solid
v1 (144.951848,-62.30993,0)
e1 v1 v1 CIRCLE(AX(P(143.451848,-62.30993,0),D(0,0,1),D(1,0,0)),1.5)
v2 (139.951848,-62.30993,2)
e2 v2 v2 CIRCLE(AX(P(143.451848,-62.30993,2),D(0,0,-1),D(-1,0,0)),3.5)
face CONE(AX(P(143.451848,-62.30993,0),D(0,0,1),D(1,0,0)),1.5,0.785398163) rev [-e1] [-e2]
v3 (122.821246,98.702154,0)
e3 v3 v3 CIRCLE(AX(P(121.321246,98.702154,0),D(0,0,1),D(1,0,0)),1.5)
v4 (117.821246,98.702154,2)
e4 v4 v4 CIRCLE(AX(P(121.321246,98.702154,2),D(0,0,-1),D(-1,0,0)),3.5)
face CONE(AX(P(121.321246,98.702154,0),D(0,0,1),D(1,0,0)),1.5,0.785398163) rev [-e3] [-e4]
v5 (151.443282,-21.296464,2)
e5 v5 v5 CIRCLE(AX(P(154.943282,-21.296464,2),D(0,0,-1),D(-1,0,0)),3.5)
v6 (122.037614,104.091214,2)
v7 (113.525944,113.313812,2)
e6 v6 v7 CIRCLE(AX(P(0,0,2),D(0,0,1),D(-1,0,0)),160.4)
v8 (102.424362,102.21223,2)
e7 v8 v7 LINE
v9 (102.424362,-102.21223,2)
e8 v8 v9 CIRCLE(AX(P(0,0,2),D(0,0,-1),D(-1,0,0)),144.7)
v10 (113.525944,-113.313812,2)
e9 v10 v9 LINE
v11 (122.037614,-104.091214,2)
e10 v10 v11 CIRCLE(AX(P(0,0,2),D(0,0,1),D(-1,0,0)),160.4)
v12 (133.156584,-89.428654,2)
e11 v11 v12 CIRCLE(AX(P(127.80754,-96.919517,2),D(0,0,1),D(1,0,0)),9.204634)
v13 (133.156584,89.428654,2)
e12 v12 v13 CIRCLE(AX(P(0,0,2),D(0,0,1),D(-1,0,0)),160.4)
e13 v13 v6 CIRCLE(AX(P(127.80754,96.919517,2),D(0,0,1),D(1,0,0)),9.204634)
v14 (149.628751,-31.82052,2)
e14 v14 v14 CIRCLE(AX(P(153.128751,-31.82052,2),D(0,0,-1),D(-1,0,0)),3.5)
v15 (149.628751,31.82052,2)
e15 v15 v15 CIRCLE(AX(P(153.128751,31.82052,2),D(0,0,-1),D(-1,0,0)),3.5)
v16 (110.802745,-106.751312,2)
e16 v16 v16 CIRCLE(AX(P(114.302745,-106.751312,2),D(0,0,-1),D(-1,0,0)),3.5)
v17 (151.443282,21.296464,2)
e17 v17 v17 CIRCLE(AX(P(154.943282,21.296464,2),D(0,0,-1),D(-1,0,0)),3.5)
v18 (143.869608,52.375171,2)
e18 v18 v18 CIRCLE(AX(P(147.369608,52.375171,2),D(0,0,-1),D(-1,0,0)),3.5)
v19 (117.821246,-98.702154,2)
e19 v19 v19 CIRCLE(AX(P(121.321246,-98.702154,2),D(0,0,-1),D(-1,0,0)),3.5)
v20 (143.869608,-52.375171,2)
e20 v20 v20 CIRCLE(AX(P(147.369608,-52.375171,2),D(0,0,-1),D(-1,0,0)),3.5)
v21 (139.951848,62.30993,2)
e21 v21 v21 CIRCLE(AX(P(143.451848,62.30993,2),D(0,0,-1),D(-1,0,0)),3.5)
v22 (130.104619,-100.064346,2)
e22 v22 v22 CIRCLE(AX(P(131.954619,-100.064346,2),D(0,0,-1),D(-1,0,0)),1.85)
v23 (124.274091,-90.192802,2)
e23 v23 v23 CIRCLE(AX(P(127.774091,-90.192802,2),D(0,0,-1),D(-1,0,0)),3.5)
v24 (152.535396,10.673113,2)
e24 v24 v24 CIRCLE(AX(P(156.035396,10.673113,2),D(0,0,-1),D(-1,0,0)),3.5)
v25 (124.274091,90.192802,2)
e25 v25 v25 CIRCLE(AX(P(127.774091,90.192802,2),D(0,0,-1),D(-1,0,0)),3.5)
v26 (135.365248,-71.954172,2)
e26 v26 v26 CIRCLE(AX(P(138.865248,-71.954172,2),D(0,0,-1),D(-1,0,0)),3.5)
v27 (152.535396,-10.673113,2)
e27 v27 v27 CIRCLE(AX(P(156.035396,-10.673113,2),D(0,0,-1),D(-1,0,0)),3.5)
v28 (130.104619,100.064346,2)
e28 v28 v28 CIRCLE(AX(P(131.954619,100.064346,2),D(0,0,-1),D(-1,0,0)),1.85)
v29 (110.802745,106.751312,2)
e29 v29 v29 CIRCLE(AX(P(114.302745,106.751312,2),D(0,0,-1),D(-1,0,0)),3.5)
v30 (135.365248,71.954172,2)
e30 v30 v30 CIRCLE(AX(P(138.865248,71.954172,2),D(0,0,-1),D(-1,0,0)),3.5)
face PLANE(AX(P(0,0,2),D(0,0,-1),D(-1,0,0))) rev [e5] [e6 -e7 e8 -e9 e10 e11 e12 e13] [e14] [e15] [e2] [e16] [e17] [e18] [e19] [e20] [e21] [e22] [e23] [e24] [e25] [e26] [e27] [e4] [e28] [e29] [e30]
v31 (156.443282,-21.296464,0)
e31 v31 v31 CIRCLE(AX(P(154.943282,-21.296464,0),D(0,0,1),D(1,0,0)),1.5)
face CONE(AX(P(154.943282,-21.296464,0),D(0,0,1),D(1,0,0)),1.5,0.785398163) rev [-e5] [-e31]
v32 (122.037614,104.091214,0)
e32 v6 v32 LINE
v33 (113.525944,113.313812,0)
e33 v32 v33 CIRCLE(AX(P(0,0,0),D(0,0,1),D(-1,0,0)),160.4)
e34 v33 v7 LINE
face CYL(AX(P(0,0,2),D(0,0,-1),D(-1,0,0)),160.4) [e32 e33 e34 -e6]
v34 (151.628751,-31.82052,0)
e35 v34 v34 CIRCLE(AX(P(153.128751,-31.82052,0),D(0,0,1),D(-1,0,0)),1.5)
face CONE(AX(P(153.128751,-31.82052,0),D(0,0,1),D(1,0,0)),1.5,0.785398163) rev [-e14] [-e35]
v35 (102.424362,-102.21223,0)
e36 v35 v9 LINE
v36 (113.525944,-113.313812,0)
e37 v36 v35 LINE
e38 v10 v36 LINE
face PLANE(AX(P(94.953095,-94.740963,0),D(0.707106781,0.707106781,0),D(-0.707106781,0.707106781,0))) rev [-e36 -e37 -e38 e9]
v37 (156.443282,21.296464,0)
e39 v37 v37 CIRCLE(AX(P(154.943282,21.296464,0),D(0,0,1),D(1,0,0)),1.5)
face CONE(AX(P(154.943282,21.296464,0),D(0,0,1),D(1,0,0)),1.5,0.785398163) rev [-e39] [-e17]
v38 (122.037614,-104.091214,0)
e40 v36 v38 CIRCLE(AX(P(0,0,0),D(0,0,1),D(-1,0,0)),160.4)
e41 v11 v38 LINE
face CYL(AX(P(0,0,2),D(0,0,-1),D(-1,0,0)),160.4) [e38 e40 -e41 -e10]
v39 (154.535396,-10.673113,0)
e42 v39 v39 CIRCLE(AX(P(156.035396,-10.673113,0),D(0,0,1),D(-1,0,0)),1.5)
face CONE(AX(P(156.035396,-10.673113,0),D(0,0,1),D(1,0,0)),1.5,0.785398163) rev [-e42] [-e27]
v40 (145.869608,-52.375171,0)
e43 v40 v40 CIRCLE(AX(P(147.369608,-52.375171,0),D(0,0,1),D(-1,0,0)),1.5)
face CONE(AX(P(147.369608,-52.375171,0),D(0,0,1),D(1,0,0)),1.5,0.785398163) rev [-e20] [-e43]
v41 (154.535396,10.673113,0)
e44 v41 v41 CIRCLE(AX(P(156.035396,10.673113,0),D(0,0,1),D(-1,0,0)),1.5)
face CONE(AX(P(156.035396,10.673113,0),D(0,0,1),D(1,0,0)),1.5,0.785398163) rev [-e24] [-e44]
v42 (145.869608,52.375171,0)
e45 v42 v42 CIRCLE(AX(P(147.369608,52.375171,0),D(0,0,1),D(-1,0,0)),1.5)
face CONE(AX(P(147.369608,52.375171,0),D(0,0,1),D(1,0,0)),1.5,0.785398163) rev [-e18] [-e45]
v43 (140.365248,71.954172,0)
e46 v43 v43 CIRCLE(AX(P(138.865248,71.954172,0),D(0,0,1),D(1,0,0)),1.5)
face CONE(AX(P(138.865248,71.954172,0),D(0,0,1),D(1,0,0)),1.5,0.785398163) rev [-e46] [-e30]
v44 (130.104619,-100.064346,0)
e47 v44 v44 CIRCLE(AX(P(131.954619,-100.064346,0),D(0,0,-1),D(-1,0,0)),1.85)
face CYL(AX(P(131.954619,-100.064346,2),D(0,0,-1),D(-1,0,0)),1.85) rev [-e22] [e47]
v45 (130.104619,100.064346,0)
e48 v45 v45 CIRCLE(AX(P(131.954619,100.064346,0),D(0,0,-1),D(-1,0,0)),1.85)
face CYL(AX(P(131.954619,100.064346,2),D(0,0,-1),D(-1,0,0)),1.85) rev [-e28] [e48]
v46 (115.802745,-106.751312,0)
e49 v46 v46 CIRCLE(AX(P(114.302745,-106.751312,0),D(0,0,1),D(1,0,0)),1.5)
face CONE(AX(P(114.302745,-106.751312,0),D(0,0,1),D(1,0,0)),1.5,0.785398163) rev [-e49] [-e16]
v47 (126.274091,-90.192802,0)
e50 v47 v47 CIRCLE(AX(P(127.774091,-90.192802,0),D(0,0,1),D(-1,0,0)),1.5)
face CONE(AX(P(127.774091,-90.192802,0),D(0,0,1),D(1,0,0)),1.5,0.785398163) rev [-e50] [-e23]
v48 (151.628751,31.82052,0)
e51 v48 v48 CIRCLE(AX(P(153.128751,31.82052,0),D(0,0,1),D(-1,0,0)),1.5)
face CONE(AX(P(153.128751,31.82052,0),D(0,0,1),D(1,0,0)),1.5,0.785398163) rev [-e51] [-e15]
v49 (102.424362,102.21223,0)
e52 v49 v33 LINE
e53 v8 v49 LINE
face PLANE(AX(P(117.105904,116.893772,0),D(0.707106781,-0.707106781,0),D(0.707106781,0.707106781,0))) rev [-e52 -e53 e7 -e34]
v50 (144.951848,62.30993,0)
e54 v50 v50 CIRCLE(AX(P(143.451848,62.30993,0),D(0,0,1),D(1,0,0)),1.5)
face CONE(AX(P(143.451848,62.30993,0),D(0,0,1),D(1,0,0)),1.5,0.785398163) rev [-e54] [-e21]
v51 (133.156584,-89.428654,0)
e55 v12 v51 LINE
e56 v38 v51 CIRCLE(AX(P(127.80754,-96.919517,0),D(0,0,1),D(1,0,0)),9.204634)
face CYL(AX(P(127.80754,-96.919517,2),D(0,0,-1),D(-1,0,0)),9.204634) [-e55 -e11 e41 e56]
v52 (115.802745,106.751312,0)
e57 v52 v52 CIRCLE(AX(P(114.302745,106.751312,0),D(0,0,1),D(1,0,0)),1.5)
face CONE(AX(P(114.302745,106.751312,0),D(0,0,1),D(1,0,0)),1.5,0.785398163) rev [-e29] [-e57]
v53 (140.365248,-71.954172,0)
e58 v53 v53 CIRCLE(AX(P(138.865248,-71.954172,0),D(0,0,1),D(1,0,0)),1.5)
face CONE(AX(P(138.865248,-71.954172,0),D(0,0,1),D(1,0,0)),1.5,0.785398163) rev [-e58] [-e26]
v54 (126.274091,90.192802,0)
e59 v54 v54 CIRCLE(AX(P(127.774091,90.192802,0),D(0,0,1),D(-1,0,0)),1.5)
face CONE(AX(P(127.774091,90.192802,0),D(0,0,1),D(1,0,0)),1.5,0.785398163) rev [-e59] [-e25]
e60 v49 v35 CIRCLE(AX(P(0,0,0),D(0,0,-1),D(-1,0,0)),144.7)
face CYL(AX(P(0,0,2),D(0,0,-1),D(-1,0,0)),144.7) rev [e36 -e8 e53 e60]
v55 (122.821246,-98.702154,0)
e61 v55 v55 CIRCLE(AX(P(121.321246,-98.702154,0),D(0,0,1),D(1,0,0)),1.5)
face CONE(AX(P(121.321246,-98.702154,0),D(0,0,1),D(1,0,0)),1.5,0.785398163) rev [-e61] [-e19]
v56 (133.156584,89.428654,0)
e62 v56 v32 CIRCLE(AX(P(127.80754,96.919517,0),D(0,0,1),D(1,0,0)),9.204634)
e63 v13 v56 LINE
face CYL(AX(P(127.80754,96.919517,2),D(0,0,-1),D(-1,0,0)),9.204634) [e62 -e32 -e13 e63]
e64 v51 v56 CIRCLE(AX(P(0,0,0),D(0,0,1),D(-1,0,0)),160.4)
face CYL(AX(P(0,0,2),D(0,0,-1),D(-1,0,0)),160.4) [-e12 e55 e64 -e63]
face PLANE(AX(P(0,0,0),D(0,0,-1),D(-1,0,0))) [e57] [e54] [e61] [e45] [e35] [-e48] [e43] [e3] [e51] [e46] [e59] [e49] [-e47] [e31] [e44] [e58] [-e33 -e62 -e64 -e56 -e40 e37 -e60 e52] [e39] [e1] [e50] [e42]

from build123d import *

# Parameters (mm, degrees)
SKETCH1_R           = 1.5
BOSS_EXTRUDE1_DEPTH = 2
CUT_EXTRUDE1_DEPTH  = 197.459257863
CHAMFER1_SIZE       = 2
BOSS_EXTRUDE2_DEPTH = 2
CUT_EXTRUDE2_DEPTH  = 197.398014273
SKETCH5_R           = 1.85
CUT_EXTRUDE3_DEPTH  = 197.398014273


with BuildPart() as part:
    # Sketch1 → Boss-Extrude1 (new body)
    with BuildSketch(Plane.XY):
        with BuildLine():
            Line((102.318351238, 102.318351238), (113.419927702, 113.419927702))
            ThreePointArc((113.419927702, 113.419927702), (160.4, 0), (113.419927702, -113.419927702))
            Line((113.419927702, -113.419927702), (102.318351238, -102.318351238))
            ThreePointArc((102.318351238, -102.318351238), (144.7, 0), (102.318351238, 102.318351238))
        make_face()
        with Locations((121.321245866, 98.702154493)):
            Circle(SKETCH1_R, mode=Mode.SUBTRACT)
        with Locations((143.451847555, 62.309930452)):
            Circle(SKETCH1_R, mode=Mode.SUBTRACT)
        with Locations((154.94328196, 21.296463919)):
            Circle(SKETCH1_R, mode=Mode.SUBTRACT)
        with Locations((154.94328196, -21.296463919)):
            Circle(SKETCH1_R, mode=Mode.SUBTRACT)
        with Locations((143.451847555, -62.309930452)):
            Circle(SKETCH1_R, mode=Mode.SUBTRACT)
        with Locations((121.321245866, -98.702154493)):
            Circle(SKETCH1_R, mode=Mode.SUBTRACT)
        with Locations(Location((127.774091267, 90.192802379, 0), (0, 0, 180))):
            Circle(SKETCH1_R, mode=Mode.SUBTRACT)
        with Locations(Location((147.369608219, 52.375171344, 0), (0, 0, 180))):
            Circle(SKETCH1_R, mode=Mode.SUBTRACT)
        with Locations(Location((153.128751314, 31.820520441, 0), (0, 0, 180))):
            Circle(SKETCH1_R, mode=Mode.SUBTRACT)
        with Locations(Location((156.035395501, 10.67311345, 0), (0, 0, 180))):
            Circle(SKETCH1_R, mode=Mode.SUBTRACT)
        with Locations(Location((127.774091267, -90.192802379, 0), (0, 0, 180))):
            Circle(SKETCH1_R, mode=Mode.SUBTRACT)
        with Locations(Location((147.369608219, -52.375171344, 0), (0, 0, 180))):
            Circle(SKETCH1_R, mode=Mode.SUBTRACT)
        with Locations(Location((153.128751314, -31.820520441, 0), (0, 0, 180))):
            Circle(SKETCH1_R, mode=Mode.SUBTRACT)
        with Locations(Location((156.035395501, -10.67311345, 0), (0, 0, 180))):
            Circle(SKETCH1_R, mode=Mode.SUBTRACT)
        with Locations((138.865248158, 71.954171901)):
            Circle(SKETCH1_R, mode=Mode.SUBTRACT)
        with Locations((114.302744813, 106.751311599)):
            Circle(SKETCH1_R, mode=Mode.SUBTRACT)
        with Locations((138.865248158, -71.954171901)):
            Circle(SKETCH1_R, mode=Mode.SUBTRACT)
        with Locations((114.302744813, -106.751311599)):
            Circle(SKETCH1_R, mode=Mode.SUBTRACT)
    extrude(amount=BOSS_EXTRUDE1_DEPTH)

    # Sketch2 → Cut-Extrude1 (cut, through all)
    with BuildSketch(Plane.XY.offset(2)):
        Polygon((117.10590357, 116.893771535), (92.696291985, 92.484159951), (81.614099529, 103.566352407), (106.023711114, 127.975963992), align=None)
        Polygon((94.953094668, -94.740962634), (127.588403443, -127.376271408), (106.110382849, -148.854292002), (73.475074075, -116.218983227), align=None)
    extrude(amount=-CUT_EXTRUDE1_DEPTH, mode=Mode.SUBTRACT)

    # Chamfer1
    chamfer1_edges = [part.edges().sort_by_distance(p)[0] for p in [
        (119.821245866, 98.702154493, 2),
        (141.951847555, 62.309930452, 2),
        (153.44328196, 21.296463919, 2),
        (153.44328196, -21.296463919, 2),
        (141.951847555, -62.309930452, 2),
        (119.821245866, -98.702154493, 2),
        (129.274091267, 90.192802379, 2),
        (148.869608219, 52.375171344, 2),
        (154.628751314, 31.820520441, 2),
        (157.535395501, 10.67311345, 2),
        (129.274091267, -90.192802379, 2),
        (148.869608219, -52.375171344, 2),
        (154.628751314, -31.820520441, 2),
        (157.535395501, -10.67311345, 2),
        (112.802744813, 106.751311599, 2),
        (137.365248158, 71.954171901, 2),
        (137.365248158, -71.954171901, 2),
        (112.802744813, -106.751311599, 2),
    ]]
    chamfer(chamfer1_edges, length=CHAMFER1_SIZE - 0.0001)  # a hair under: the kernel refuses the full size

    # Sketch3 → Boss-Extrude2 (add)
    with BuildSketch(Plane(origin=(0, 0, 0), x_dir=(-1, 0, 0), z_dir=(0, 0, -1))):
        with BuildLine():
            ThreePointArc((-133.156583772, -89.428654235), (-140.426335781, -106.48865188), (-122.037613507, -104.091214277))
            ThreePointArc((-122.037613507, -104.091214277), (-127.807539871, -96.919516879), (-133.156583772, -89.428654235))
        make_face()
        with BuildLine():
            ThreePointArc((-122.037613507, 104.091214277), (-140.426335781, 106.48865188), (-133.156583772, 89.428654235))
            ThreePointArc((-133.156583772, 89.428654235), (-127.807539871, 96.919516879), (-122.037613507, 104.091214277))
        make_face()
    extrude(amount=-BOSS_EXTRUDE2_DEPTH)

    # Sketch4 → Cut-Extrude2 (cut, through all)
    with BuildSketch(Plane(origin=(0, 0, 0), x_dir=(-1, 0, 0), z_dir=(0, 0, -1))):
        with BuildLine():
            ThreePointArc((-122.037613507, -104.091214277), (-135.141839583, -102.481291915), (-133.156583772, -89.428654235))
            ThreePointArc((-133.156583772, -89.428654235), (-147.070909653, -111.527391302), (-122.037613507, -104.091214277))
        make_face()
        with BuildLine():
            ThreePointArc((-133.156583772, 89.428654235), (-135.141839583, 102.481291915), (-122.037613507, 104.091214277))
            ThreePointArc((-122.037613507, 104.091214277), (-145.081010417, 110.018403078), (-133.156583772, 89.428654235))
        make_face()
    extrude(amount=-CUT_EXTRUDE2_DEPTH, mode=Mode.SUBTRACT)

    # Sketch5 → Cut-Extrude3 (cut, through all)
    with BuildSketch(Plane(origin=(0, 0, 0), x_dir=(-1, 0, 0), z_dir=(0, 0, -1))):
        with Locations((-131.954619137, -100.064346357)):
            Circle(SKETCH5_R)
        with Locations((-131.954619137, 100.064346357)):
            Circle(SKETCH5_R)
    extrude(amount=-CUT_EXTRUDE3_DEPTH, mode=Mode.SUBTRACT)


solid = part.part
